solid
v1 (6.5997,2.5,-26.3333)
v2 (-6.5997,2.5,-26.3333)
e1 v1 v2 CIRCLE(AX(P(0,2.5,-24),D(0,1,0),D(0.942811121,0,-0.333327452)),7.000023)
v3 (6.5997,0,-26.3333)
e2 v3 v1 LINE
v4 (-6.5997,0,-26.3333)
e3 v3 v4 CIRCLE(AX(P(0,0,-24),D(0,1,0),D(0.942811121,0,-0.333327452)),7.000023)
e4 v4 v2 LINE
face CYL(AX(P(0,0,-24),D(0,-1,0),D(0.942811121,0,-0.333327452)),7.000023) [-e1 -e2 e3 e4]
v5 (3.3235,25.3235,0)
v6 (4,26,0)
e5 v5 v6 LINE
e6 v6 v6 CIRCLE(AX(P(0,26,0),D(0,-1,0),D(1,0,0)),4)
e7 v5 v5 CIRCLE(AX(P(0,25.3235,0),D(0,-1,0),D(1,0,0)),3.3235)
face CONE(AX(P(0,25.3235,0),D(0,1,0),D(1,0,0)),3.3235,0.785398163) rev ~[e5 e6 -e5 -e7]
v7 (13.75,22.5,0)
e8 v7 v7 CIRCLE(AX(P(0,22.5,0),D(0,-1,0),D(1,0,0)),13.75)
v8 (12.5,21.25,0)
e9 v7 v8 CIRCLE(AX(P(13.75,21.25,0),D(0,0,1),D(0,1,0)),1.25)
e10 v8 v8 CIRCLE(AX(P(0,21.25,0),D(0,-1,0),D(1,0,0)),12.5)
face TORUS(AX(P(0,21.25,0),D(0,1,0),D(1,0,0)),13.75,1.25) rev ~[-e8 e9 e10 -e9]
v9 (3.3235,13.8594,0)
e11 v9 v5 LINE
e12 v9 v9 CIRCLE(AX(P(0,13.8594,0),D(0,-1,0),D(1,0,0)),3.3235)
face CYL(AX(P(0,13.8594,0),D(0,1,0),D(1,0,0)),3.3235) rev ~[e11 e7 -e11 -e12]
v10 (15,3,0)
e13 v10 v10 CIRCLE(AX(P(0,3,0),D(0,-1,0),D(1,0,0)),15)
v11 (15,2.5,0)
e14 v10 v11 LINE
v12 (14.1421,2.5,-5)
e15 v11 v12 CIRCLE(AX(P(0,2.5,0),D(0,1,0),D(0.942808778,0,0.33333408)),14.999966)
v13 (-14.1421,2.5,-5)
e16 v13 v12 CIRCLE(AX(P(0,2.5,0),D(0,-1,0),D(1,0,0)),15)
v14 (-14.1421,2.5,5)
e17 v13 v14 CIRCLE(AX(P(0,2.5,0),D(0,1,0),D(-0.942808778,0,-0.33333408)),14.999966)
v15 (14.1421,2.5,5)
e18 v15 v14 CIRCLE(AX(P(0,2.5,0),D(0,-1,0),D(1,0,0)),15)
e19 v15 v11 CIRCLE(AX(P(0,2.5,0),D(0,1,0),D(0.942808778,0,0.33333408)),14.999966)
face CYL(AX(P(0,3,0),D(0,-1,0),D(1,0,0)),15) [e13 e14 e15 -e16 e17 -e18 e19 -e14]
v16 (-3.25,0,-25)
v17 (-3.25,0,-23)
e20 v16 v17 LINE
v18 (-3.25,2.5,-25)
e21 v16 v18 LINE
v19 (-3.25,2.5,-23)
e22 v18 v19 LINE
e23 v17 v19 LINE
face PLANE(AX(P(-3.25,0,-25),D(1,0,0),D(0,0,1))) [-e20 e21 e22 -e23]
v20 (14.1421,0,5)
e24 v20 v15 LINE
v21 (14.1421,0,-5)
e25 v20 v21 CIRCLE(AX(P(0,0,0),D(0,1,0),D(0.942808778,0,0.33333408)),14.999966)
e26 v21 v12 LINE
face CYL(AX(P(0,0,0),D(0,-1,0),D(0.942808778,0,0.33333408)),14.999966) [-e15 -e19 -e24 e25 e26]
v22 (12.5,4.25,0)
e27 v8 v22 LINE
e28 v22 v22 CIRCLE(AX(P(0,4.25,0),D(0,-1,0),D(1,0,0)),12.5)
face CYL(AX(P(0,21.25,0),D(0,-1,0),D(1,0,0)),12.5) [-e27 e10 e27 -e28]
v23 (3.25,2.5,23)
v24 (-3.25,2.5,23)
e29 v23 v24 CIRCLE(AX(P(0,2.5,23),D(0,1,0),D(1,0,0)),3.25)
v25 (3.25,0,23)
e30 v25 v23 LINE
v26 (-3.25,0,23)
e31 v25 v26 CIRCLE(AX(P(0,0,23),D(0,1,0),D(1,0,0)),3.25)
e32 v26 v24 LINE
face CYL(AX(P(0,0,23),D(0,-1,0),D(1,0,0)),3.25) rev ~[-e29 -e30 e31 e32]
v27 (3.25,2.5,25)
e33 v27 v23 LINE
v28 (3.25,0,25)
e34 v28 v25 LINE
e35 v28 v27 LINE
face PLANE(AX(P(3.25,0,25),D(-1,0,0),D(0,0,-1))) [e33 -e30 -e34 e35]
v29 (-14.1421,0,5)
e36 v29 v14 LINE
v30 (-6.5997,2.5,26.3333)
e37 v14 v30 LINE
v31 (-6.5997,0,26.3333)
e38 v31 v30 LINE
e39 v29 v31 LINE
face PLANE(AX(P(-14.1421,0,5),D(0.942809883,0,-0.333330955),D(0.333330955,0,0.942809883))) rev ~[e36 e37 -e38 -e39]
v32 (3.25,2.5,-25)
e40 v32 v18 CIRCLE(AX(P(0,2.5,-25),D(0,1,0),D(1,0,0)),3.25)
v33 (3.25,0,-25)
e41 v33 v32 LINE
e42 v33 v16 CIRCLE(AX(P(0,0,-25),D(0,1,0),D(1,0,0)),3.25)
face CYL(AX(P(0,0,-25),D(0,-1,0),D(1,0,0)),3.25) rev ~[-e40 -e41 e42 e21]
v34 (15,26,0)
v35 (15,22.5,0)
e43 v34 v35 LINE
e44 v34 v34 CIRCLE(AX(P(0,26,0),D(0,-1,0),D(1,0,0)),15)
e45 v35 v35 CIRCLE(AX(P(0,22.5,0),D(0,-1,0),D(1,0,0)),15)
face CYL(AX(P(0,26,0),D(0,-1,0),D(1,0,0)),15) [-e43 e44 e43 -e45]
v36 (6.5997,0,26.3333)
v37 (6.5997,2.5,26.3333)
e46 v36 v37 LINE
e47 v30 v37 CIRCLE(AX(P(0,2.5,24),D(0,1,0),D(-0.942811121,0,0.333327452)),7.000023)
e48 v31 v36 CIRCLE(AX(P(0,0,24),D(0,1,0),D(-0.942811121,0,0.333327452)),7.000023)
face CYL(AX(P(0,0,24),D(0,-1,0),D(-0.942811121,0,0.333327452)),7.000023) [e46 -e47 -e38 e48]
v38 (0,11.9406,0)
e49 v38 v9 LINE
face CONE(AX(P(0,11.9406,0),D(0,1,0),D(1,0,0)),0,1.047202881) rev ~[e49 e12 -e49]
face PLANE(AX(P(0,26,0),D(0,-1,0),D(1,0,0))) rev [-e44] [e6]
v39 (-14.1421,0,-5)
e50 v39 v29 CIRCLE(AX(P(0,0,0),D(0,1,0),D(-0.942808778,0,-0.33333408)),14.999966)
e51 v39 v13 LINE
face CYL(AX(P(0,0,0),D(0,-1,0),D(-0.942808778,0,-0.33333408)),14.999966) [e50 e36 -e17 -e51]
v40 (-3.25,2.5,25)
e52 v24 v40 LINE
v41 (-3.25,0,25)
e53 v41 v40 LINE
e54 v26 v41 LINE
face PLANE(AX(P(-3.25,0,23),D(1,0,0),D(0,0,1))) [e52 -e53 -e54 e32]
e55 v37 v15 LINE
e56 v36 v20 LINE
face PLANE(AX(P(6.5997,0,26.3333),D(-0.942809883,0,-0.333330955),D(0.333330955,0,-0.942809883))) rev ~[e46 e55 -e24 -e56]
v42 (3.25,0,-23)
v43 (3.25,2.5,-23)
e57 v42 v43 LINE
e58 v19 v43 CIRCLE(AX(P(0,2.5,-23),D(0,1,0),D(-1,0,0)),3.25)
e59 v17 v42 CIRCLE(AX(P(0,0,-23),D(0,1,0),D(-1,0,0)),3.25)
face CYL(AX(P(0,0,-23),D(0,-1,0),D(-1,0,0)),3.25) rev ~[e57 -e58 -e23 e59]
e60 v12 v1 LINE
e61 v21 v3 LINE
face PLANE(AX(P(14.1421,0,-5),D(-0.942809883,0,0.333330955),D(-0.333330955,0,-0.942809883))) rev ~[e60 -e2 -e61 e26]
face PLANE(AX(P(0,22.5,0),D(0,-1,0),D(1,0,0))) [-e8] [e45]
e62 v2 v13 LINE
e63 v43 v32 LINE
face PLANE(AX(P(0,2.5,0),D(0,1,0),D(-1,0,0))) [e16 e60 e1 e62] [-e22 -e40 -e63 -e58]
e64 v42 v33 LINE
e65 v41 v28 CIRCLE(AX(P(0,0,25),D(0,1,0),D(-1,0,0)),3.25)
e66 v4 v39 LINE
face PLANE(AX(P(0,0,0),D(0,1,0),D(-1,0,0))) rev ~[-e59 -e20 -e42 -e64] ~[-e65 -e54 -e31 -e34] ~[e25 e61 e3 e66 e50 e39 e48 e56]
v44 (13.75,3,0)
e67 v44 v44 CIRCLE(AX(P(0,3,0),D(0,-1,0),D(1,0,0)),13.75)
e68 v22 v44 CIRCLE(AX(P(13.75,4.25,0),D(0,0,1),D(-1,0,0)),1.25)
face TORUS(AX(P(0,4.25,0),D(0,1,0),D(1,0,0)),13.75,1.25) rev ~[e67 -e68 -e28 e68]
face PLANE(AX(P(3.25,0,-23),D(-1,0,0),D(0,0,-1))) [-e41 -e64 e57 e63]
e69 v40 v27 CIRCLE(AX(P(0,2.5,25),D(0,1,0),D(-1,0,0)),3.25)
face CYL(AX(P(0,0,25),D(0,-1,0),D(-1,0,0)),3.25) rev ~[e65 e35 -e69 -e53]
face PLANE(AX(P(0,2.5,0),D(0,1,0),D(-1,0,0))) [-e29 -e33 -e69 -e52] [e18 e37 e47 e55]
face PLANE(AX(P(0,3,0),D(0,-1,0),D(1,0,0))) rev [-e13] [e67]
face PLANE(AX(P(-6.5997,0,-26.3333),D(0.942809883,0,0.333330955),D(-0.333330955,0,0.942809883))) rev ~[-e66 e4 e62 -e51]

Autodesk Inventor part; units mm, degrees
ref_plane "XZ Plane" through (0, 0, 0) normal (0, 1, 0) x (-1, 0, 0)
sketch "__1" plane through (0, 0, 0) normal (0, 1, 0) x (-1, 0, 0)
  arc A0 (14.1421, -5) -> (14.1421, 5) centre (0, 0) ccw
  line L0 (14.1421, 5) -> (6.5997, 26.3333)
  arc A1 (6.5997, 26.3333) -> (-6.5997, 26.3333) centre (0, 24) ccw
  line L1 (-6.5997, 26.3333) -> (-14.1421, 5)
  arc A2 (-14.1421, 5) -> (-14.1421, -5) centre (0, 0) ccw
  line L2 (-14.1421, -5) -> (-6.5997, -26.3333)
  arc A3 (-6.5997, -26.3333) -> (6.5997, -26.3333) centre (0, -24) ccw
  line L3 (6.5997, -26.3333) -> (14.1421, -5)
  arc A4 (3.25, -23) -> (-3.25, -23) centre (0, -23) ccw
  line L4 (-3.25, -23) -> (-3.25, -25)
  arc A5 (-3.25, -25) -> (3.25, -25) centre (0, -25) ccw
  line L5 (3.25, -25) -> (3.25, -23)
  line L6 (3.25, 23) -> (3.25, 25)
  arc A6 (3.25, 25) -> (-3.25, 25) centre (0, 25) ccw
  line L7 (-3.25, 25) -> (-3.25, 23)
  arc A7 (-3.25, 23) -> (3.25, 23) centre (0, 23) ccw
extrude "Extrusion1" add sketch "__1" along normal blind 2.5
sketch "__2" plane through (0, 0, 0) normal (0, 0, 1) x (1, 0, 0)
  line L0 (0, 2.5) -> (0, 26)
  line L1 (0, 11.9406) -> (3.3235, 13.8594)
  line L2 (3.3235, 13.8594) -> (3.3235, 25.3235)
  line L3 (3.3235, 25.3235) -> (4, 26)
  line L4 (4, 26) -> (15, 26)
  line L5 (15, 26) -> (15, 22.5)
  line L6 (15, 22.5) -> (13.75, 22.5)
  arc A0 (13.75, 22.5) -> (12.5, 21.25) centre (13.75, 21.25) ccw
  line L7 (12.5, 21.25) -> (12.5, 4.25)
  arc A1 (12.5, 4.25) -> (13.75, 3) centre (13.75, 4.25) ccw
  line L8 (13.75, 3) -> (15, 3)
  line L9 (15, 3) -> (15, 2.5)
  line L10 (15, 2.5) -> (0, 2.5)
  line L11 (0, 2.5) -> (0, 11.9406)
revolve "Revolution1" add sketch "__2" angle 360 about axis through (0, 2.5, 0) along (0, -1, 0)
thread "Thread1" size "M8x1.25" class "6H" standard "ISO Metric profile" length 7.3235
ref_plane "Arbeitsebene1" through (0, 0, 24) normal (0, 0, 1) x (1, 0, 0)
ref_plane "Arbeitsebene2" through (0, 0, -24) normal (0, 0, 1) x (1, 0, 0)
properties part number "NHF19-3026-M8"
